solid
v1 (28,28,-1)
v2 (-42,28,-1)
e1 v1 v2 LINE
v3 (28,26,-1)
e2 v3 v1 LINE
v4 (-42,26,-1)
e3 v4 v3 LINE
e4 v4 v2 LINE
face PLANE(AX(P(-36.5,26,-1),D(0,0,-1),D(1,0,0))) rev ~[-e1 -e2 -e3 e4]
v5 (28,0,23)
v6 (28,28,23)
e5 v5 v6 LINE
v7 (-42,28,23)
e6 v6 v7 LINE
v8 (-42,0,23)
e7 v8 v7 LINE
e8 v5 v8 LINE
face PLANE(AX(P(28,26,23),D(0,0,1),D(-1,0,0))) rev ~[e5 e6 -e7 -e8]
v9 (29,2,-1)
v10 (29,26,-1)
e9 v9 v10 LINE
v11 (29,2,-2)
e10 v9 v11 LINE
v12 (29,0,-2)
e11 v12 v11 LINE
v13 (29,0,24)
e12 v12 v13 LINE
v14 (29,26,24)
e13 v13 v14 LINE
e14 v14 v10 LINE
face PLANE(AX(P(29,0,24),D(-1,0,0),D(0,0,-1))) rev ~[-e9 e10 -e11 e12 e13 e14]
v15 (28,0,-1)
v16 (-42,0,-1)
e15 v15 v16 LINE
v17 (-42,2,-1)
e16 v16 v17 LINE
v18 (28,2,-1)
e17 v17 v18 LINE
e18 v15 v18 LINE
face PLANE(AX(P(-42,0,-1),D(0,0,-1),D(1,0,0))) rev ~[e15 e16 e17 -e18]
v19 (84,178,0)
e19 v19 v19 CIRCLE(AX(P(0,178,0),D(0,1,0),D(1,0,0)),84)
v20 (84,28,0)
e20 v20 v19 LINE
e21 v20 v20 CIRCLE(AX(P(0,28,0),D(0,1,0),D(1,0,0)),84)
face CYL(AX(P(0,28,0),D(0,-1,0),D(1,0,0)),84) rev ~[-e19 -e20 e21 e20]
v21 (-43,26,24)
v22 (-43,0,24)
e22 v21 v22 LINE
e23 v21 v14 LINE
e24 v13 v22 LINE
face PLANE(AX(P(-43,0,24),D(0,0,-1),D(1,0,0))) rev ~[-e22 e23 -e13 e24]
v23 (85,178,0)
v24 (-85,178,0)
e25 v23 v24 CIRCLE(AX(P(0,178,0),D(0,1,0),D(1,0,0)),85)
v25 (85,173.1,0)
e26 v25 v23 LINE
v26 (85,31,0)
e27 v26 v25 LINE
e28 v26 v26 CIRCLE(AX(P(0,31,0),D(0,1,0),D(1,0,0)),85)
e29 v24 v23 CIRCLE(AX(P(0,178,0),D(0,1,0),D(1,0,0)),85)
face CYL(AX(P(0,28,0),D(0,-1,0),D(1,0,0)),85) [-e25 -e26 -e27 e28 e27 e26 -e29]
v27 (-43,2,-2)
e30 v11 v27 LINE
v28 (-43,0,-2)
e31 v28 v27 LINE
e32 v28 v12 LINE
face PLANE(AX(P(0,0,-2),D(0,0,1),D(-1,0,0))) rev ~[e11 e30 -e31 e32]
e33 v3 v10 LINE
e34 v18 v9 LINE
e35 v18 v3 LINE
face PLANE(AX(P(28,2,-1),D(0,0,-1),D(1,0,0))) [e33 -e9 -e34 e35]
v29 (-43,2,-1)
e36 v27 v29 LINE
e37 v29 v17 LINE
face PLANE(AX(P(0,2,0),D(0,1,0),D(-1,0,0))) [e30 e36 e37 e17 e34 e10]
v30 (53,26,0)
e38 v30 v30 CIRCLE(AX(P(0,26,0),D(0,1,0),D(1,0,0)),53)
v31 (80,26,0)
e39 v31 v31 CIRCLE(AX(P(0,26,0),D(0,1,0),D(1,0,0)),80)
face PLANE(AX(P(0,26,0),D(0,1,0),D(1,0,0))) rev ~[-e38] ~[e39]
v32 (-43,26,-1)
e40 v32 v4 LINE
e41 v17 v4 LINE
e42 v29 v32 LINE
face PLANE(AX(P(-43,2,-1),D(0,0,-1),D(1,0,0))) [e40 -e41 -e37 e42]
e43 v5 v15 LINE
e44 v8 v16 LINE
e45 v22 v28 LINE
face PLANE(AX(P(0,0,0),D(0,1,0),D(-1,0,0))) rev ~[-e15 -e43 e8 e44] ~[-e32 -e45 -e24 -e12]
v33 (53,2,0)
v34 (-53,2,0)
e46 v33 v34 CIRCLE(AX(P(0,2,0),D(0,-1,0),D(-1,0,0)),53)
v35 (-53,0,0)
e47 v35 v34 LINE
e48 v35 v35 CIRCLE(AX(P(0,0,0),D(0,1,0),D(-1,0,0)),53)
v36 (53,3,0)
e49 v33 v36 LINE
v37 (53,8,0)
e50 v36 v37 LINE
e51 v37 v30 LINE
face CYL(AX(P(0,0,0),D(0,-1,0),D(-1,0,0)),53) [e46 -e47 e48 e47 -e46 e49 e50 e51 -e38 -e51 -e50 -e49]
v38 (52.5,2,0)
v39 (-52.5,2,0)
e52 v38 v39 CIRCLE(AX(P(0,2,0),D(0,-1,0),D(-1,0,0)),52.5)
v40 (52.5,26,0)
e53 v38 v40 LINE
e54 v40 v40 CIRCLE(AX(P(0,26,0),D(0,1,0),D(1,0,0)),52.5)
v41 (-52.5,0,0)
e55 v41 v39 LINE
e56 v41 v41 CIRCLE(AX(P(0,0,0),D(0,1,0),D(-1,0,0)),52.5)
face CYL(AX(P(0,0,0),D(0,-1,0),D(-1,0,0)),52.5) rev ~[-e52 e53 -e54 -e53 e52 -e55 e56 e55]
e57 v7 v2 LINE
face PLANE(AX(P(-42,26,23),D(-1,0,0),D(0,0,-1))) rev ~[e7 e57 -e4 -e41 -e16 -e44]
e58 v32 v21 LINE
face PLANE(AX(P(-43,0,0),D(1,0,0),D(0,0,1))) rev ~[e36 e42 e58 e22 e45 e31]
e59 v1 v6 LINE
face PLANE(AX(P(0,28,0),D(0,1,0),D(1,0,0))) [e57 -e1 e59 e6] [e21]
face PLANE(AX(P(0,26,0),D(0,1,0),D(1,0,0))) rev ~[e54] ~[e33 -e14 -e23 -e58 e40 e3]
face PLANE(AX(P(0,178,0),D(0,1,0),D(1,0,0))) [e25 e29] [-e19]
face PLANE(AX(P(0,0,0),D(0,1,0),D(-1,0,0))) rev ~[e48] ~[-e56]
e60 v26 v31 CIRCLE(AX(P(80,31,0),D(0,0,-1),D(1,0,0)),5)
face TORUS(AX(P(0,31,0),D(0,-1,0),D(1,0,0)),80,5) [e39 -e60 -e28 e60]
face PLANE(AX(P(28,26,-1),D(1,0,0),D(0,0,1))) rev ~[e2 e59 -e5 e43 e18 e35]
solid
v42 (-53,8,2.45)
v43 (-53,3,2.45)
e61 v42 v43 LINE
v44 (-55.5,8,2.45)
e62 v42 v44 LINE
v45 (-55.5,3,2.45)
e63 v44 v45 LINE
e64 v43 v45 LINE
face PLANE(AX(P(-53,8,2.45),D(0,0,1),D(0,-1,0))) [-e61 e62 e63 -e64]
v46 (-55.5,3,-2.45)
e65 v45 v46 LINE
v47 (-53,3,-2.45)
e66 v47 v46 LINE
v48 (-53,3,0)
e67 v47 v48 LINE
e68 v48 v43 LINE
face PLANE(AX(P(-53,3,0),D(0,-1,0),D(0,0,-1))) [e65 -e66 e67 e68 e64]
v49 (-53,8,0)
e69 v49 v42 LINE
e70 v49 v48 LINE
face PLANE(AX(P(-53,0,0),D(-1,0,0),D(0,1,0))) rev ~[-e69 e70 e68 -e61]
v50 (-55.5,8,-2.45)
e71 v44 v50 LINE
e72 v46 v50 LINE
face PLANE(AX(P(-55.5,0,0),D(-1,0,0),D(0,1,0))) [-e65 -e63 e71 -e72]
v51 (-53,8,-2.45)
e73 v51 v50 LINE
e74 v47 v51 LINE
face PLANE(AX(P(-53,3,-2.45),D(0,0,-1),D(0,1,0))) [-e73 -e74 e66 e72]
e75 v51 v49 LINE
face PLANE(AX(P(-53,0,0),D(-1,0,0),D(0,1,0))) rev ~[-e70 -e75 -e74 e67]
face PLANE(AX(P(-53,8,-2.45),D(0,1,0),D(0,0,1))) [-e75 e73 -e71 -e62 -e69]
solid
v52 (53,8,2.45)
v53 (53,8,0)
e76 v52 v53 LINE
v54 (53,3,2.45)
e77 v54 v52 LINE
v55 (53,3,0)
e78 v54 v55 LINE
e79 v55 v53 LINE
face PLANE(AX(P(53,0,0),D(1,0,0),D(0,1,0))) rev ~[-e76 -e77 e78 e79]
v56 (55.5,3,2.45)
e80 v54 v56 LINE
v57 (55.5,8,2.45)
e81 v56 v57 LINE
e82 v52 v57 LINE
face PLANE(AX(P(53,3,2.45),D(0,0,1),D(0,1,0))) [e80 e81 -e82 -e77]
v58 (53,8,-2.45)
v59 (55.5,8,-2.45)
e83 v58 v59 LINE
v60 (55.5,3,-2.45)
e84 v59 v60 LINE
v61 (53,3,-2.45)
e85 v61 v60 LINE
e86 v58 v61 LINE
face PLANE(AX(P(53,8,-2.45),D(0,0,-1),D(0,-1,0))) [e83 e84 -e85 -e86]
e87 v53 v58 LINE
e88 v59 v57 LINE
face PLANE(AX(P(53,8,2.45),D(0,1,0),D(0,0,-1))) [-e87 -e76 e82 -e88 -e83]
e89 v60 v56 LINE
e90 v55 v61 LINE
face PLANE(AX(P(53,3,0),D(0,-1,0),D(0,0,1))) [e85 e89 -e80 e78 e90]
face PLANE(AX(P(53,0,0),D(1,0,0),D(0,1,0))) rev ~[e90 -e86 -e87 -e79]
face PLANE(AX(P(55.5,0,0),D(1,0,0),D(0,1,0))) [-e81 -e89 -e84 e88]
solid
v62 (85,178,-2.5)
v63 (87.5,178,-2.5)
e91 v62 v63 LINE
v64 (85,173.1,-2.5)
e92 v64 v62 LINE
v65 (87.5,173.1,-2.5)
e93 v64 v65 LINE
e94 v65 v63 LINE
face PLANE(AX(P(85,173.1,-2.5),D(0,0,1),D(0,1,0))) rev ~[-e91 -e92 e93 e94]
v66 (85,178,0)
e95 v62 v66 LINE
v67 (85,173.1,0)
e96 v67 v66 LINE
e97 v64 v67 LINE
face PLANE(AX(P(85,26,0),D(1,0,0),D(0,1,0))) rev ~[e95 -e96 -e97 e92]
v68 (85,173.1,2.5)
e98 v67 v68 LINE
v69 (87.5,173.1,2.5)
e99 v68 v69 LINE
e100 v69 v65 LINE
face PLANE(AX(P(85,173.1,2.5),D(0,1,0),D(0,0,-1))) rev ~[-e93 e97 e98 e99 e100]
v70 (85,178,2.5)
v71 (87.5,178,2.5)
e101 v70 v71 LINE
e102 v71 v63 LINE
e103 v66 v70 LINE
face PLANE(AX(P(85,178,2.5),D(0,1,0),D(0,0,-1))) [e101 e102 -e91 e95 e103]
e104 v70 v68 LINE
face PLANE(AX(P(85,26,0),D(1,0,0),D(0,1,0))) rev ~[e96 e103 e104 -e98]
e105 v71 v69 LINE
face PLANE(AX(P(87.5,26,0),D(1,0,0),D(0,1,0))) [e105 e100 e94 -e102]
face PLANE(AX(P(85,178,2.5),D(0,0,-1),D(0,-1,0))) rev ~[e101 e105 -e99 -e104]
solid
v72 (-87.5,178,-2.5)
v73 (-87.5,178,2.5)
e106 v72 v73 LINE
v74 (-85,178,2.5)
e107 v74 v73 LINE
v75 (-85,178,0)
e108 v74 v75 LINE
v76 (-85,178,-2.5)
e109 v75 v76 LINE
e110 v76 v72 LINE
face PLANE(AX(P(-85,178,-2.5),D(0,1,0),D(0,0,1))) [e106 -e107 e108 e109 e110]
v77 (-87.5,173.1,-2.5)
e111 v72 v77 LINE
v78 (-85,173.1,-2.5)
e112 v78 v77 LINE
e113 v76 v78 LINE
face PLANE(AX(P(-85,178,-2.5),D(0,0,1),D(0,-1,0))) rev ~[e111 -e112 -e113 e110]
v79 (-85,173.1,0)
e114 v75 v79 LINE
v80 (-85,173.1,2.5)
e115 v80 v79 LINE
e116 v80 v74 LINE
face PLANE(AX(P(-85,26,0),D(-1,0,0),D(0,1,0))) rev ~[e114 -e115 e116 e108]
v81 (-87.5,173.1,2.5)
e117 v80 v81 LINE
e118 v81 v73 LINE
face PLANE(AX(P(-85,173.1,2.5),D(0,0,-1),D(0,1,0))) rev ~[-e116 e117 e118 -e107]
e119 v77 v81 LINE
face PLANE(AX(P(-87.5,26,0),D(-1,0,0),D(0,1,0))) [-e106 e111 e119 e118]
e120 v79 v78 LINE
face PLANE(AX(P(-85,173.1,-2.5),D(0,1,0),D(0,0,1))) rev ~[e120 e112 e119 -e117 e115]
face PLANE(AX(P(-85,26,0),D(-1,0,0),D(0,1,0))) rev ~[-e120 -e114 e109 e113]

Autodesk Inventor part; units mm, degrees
ref_plane "XZ Plane" through (0, 0, 0) normal (0, 1, 0) x (-1, 0, 0)
sketch "Náčrt10" plane through (0, 0, 0) normal (0, 1, 0) x (-1, 0, 0)
  circle A0 centre (0, 0) radius 52.5
  circle A1 centre (0, 0) radius 53
  line L0 (43, 24) -> (-29, 24)
  line L1 (-29, 24) -> (-29, -2)
  line L2 (-29, -2) -> (43, -2)
  line L3 (43, -2) -> (43, 24)
  line L4 (42, -1) -> (-28, -1)
  line L5 (-28, 23) -> (42, 23)
  line L6 (42, 23) -> (42, -1)
  line L7 (0, -74.2) -> (0, 74.2) projected
  line L8 (-74.2, 0) -> (74.2, 0) projected
  line L9 (-28, 23) -> (-28, -1)
  point P0 (-52.5, 0)
  point P1 (-53, 0)
  point P2 (0, -53)
  point P3 (0, -52.5)
  dimension "d54" = 105
  dimension "d55" = 106
  dimension "d56" = 72
  dimension "d57" = 26
  dimension "d58" = 1
  dimension "d59" = 1
  dimension "d95" = 28
  dimension "d96" = 1
  dimension "d97" = 1
extrude "Vysunutí12" add sketch "Náčrt10" along normal blind 2 contours L8 A1 L7 A0 | A0 L7 A1 L8 | A0 L8 A1 L7 | L7 A1 L8 A0 | L8 L6 L5 L7 L0 L3 | L3 L2 L7 L4 L6 L8 | L7 L5 L9 L8 L1 L0 | L2 L1 L8 L9 L4 L7
sketch "Náčrt12" plane through (0, 2, 0) normal (0, 1, 0) x (1, 0, 0)
  circle A0 centre (0, 0) radius 52.5
  circle A1 centre (0, 0) radius 53
  line L0 (29, -24) -> (29, 2) projected
  line L1 (-43, -24) -> (29, -24) projected
  line L2 (-43, 2) -> (-43, -24) projected
  line L3 (29, 2) -> (-43, 2) projected
  line L4 (-43, 2) -> (29, 2)
  line L5 (29, 2) -> (29, -24)
  line L6 (29, -24) -> (-43, -24)
  line L7 (-43, -24) -> (-43, 2)
  line L8 (-43, -24) -> (29, -24)
  line L9 (29, -24) -> (29, 2)
  line L10 (29, 2) -> (-43, 2)
  line L11 (-43, 2) -> (-43, -24)
  line L12 (-42, -23) -> (28, -23)
  line L13 (28, -23) -> (28, 1)
  line L14 (28, 1) -> (-42, 1)
  line L15 (-42, 1) -> (-42, -23)
  line L16 (-39.1162, 1) -> (-42, 1)
  line L17 (-43, 1) -> (-42, 1)
  line L18 (28, 1) -> (29, 1)
  line L19 (-43, -24) -> (29, -24)
  line L20 (29, -24) -> (29, 2)
  line L21 (29, 2) -> (-43, 2)
  line L22 (-43, 2) -> (-43, -24)
  point P0 (29, 1)
  dimension "d68" = 105
  dimension "d69" = 106
  dimension "d98" = 1
extrude "Vysunutí13" add sketch "Náčrt12" along normal blind 24 contours A1 | L1 L2 L17 L15 L12 L13 L18 L0
ref_plane "Pracovní rovina7" through (53, 0, 0) normal (1, 0, 0) x (0, 1, 0)
sketch "Náčrt13" plane through (53, 0, 0) normal (1, 0, 0) x (0, 1, 0)
  line L0 (26, -53) -> (26, 53) projected
  line L1 (0, -53) -> (0, 53) projected
  line L2 (-6, 0) -> (36, 0) projected
  line L3 (0, 74.2) -> (0, -74.2) projected
  line L4 (3, 2.45) -> (8, 2.45)
  line L5 (8, 2.45) -> (8, -2.45)
  line L6 (8, -2.45) -> (3, -2.45)
  line L7 (3, -2.45) -> (3, 2.45)
  point P0 (0, 0)
  dimension "d72" = 5
  dimension "d73" = 4.9
  dimension "d74" = 3
extrude "Vysunutí14" add sketch "Náčrt13" along normal blind 2.5
pattern_circular "Kruhové pole1" count 2 over 360 about axis through (0, -10, 0) along (0, 1, 0) of "Vysunutí14"
sketch "Náčrt14" plane through (0, 26, 0) normal (0, 1, 0) x (1, 0, 0)
  line L0 (-43, 2) -> (-43, 1) projected
  line L1 (29, 2) -> (-43, 2) projected
  line L2 (29, 1) -> (29, 2) projected
  circle A0 centre (0, 0) radius 85
  line L3 (-43, 1) -> (-43, -24) projected
  line L4 (-43, -24) -> (29, -24) projected
  line L5 (29, -24) -> (29, 1) projected
  line L6 (-36.5, 1) -> (36.5, 1)
  line L7 (28, -23) -> (-42, -23) projected
  line L8 (-42, -23) -> (-42, 1) projected
  line L9 (28, 1) -> (28, -23) projected
  line L10 (-42, 1) -> (28, 1) projected
  line L11 (28, 1) -> (29, 1) projected
  line L12 (-43, -24) -> (34, -24)
  line L13 (29, 2) -> (-46, 2)
  line L14 (-42, 1) -> (28, 1) projected
  line L15 (-42, -23) -> (28, -23)
  line L16 (28, -23) -> (28, 1)
  line L17 (-42, 1) -> (-42, -23)
  line L18 (-42, -23) -> (28, -23)
  line L19 (28, -23) -> (28, 1)
  line L20 (28, 1) -> (-42, 1)
  line L21 (-42, 1) -> (-42, -23)
  line L22 (-42, 1) -> (-43, 1) projected
  line L23 (29, 1) -> (28, 1) projected
  line L24 (-43, 1) -> (-42, 1) projected
  point P0 (-42, 1)
  point P1 (28, 1)
  point P2 (34.0001, 1)
  point P3 (28, 1)
  point P4 (28, 1)
  point P5 (35, 1)
  point P6 (-43, 1)
  dimension "d80" = 170
extrude "Vysunutí15" add sketch "Náčrt14" along normal blind 2 contours L1 L2 L6 L10 L22 L0 | L22 L8 L7 L9 L6 L5 L4 L3 | A0
sketch "Náčrt15" plane through (0, 28, 0) normal (0, 1, 0) x (1, 0, 0)
  circle A0 centre (0, 0) radius 85
  circle A1 centre (0, 0) radius 84
  dimension "d83" = 170
  dimension "d84" = 168
extrude "Vysunutí16" add sketch "Náčrt15" along normal blind 150
fillet "Zaoblení7" radius 5 1 edges at (-85, 26, 0)
ref_plane "Pracovní rovina8" through (85, 26, 0) normal (1, 0, 0) x (0, 1, 0)
sketch "Náčrt16" plane through (85, 26, 0) normal (1, 0, 0) x (0, 1, 0)
  line L0 (152, 84) -> (152, -84) projected
  line L1 (152, 2.5) -> (147.1, 2.5)
  line L2 (147.1, 2.5) -> (147.1, -2.5)
  line L3 (147.1, -2.5) -> (152, -2.5)
  line L4 (152, -2.5) -> (152, 2.5)
  line L5 (-26, 119) -> (-26, -119) projected
  line L6 (-66.4, 0) -> (188.4, 0) projected
  point P0 (-26, 0)
  point P1 (152, -2.5)
  dimension "d88" = 4.9
  dimension "d89" = 5
extrude "Vysunutí17" add sketch "Náčrt16" along normal blind 2.5
pattern_circular "Kruhové pole2" count 2 over 360 about axis through (0, -10, 0) along (0, 1, 0) of "Vysunutí17"
properties part number "Zásobník oprava"
